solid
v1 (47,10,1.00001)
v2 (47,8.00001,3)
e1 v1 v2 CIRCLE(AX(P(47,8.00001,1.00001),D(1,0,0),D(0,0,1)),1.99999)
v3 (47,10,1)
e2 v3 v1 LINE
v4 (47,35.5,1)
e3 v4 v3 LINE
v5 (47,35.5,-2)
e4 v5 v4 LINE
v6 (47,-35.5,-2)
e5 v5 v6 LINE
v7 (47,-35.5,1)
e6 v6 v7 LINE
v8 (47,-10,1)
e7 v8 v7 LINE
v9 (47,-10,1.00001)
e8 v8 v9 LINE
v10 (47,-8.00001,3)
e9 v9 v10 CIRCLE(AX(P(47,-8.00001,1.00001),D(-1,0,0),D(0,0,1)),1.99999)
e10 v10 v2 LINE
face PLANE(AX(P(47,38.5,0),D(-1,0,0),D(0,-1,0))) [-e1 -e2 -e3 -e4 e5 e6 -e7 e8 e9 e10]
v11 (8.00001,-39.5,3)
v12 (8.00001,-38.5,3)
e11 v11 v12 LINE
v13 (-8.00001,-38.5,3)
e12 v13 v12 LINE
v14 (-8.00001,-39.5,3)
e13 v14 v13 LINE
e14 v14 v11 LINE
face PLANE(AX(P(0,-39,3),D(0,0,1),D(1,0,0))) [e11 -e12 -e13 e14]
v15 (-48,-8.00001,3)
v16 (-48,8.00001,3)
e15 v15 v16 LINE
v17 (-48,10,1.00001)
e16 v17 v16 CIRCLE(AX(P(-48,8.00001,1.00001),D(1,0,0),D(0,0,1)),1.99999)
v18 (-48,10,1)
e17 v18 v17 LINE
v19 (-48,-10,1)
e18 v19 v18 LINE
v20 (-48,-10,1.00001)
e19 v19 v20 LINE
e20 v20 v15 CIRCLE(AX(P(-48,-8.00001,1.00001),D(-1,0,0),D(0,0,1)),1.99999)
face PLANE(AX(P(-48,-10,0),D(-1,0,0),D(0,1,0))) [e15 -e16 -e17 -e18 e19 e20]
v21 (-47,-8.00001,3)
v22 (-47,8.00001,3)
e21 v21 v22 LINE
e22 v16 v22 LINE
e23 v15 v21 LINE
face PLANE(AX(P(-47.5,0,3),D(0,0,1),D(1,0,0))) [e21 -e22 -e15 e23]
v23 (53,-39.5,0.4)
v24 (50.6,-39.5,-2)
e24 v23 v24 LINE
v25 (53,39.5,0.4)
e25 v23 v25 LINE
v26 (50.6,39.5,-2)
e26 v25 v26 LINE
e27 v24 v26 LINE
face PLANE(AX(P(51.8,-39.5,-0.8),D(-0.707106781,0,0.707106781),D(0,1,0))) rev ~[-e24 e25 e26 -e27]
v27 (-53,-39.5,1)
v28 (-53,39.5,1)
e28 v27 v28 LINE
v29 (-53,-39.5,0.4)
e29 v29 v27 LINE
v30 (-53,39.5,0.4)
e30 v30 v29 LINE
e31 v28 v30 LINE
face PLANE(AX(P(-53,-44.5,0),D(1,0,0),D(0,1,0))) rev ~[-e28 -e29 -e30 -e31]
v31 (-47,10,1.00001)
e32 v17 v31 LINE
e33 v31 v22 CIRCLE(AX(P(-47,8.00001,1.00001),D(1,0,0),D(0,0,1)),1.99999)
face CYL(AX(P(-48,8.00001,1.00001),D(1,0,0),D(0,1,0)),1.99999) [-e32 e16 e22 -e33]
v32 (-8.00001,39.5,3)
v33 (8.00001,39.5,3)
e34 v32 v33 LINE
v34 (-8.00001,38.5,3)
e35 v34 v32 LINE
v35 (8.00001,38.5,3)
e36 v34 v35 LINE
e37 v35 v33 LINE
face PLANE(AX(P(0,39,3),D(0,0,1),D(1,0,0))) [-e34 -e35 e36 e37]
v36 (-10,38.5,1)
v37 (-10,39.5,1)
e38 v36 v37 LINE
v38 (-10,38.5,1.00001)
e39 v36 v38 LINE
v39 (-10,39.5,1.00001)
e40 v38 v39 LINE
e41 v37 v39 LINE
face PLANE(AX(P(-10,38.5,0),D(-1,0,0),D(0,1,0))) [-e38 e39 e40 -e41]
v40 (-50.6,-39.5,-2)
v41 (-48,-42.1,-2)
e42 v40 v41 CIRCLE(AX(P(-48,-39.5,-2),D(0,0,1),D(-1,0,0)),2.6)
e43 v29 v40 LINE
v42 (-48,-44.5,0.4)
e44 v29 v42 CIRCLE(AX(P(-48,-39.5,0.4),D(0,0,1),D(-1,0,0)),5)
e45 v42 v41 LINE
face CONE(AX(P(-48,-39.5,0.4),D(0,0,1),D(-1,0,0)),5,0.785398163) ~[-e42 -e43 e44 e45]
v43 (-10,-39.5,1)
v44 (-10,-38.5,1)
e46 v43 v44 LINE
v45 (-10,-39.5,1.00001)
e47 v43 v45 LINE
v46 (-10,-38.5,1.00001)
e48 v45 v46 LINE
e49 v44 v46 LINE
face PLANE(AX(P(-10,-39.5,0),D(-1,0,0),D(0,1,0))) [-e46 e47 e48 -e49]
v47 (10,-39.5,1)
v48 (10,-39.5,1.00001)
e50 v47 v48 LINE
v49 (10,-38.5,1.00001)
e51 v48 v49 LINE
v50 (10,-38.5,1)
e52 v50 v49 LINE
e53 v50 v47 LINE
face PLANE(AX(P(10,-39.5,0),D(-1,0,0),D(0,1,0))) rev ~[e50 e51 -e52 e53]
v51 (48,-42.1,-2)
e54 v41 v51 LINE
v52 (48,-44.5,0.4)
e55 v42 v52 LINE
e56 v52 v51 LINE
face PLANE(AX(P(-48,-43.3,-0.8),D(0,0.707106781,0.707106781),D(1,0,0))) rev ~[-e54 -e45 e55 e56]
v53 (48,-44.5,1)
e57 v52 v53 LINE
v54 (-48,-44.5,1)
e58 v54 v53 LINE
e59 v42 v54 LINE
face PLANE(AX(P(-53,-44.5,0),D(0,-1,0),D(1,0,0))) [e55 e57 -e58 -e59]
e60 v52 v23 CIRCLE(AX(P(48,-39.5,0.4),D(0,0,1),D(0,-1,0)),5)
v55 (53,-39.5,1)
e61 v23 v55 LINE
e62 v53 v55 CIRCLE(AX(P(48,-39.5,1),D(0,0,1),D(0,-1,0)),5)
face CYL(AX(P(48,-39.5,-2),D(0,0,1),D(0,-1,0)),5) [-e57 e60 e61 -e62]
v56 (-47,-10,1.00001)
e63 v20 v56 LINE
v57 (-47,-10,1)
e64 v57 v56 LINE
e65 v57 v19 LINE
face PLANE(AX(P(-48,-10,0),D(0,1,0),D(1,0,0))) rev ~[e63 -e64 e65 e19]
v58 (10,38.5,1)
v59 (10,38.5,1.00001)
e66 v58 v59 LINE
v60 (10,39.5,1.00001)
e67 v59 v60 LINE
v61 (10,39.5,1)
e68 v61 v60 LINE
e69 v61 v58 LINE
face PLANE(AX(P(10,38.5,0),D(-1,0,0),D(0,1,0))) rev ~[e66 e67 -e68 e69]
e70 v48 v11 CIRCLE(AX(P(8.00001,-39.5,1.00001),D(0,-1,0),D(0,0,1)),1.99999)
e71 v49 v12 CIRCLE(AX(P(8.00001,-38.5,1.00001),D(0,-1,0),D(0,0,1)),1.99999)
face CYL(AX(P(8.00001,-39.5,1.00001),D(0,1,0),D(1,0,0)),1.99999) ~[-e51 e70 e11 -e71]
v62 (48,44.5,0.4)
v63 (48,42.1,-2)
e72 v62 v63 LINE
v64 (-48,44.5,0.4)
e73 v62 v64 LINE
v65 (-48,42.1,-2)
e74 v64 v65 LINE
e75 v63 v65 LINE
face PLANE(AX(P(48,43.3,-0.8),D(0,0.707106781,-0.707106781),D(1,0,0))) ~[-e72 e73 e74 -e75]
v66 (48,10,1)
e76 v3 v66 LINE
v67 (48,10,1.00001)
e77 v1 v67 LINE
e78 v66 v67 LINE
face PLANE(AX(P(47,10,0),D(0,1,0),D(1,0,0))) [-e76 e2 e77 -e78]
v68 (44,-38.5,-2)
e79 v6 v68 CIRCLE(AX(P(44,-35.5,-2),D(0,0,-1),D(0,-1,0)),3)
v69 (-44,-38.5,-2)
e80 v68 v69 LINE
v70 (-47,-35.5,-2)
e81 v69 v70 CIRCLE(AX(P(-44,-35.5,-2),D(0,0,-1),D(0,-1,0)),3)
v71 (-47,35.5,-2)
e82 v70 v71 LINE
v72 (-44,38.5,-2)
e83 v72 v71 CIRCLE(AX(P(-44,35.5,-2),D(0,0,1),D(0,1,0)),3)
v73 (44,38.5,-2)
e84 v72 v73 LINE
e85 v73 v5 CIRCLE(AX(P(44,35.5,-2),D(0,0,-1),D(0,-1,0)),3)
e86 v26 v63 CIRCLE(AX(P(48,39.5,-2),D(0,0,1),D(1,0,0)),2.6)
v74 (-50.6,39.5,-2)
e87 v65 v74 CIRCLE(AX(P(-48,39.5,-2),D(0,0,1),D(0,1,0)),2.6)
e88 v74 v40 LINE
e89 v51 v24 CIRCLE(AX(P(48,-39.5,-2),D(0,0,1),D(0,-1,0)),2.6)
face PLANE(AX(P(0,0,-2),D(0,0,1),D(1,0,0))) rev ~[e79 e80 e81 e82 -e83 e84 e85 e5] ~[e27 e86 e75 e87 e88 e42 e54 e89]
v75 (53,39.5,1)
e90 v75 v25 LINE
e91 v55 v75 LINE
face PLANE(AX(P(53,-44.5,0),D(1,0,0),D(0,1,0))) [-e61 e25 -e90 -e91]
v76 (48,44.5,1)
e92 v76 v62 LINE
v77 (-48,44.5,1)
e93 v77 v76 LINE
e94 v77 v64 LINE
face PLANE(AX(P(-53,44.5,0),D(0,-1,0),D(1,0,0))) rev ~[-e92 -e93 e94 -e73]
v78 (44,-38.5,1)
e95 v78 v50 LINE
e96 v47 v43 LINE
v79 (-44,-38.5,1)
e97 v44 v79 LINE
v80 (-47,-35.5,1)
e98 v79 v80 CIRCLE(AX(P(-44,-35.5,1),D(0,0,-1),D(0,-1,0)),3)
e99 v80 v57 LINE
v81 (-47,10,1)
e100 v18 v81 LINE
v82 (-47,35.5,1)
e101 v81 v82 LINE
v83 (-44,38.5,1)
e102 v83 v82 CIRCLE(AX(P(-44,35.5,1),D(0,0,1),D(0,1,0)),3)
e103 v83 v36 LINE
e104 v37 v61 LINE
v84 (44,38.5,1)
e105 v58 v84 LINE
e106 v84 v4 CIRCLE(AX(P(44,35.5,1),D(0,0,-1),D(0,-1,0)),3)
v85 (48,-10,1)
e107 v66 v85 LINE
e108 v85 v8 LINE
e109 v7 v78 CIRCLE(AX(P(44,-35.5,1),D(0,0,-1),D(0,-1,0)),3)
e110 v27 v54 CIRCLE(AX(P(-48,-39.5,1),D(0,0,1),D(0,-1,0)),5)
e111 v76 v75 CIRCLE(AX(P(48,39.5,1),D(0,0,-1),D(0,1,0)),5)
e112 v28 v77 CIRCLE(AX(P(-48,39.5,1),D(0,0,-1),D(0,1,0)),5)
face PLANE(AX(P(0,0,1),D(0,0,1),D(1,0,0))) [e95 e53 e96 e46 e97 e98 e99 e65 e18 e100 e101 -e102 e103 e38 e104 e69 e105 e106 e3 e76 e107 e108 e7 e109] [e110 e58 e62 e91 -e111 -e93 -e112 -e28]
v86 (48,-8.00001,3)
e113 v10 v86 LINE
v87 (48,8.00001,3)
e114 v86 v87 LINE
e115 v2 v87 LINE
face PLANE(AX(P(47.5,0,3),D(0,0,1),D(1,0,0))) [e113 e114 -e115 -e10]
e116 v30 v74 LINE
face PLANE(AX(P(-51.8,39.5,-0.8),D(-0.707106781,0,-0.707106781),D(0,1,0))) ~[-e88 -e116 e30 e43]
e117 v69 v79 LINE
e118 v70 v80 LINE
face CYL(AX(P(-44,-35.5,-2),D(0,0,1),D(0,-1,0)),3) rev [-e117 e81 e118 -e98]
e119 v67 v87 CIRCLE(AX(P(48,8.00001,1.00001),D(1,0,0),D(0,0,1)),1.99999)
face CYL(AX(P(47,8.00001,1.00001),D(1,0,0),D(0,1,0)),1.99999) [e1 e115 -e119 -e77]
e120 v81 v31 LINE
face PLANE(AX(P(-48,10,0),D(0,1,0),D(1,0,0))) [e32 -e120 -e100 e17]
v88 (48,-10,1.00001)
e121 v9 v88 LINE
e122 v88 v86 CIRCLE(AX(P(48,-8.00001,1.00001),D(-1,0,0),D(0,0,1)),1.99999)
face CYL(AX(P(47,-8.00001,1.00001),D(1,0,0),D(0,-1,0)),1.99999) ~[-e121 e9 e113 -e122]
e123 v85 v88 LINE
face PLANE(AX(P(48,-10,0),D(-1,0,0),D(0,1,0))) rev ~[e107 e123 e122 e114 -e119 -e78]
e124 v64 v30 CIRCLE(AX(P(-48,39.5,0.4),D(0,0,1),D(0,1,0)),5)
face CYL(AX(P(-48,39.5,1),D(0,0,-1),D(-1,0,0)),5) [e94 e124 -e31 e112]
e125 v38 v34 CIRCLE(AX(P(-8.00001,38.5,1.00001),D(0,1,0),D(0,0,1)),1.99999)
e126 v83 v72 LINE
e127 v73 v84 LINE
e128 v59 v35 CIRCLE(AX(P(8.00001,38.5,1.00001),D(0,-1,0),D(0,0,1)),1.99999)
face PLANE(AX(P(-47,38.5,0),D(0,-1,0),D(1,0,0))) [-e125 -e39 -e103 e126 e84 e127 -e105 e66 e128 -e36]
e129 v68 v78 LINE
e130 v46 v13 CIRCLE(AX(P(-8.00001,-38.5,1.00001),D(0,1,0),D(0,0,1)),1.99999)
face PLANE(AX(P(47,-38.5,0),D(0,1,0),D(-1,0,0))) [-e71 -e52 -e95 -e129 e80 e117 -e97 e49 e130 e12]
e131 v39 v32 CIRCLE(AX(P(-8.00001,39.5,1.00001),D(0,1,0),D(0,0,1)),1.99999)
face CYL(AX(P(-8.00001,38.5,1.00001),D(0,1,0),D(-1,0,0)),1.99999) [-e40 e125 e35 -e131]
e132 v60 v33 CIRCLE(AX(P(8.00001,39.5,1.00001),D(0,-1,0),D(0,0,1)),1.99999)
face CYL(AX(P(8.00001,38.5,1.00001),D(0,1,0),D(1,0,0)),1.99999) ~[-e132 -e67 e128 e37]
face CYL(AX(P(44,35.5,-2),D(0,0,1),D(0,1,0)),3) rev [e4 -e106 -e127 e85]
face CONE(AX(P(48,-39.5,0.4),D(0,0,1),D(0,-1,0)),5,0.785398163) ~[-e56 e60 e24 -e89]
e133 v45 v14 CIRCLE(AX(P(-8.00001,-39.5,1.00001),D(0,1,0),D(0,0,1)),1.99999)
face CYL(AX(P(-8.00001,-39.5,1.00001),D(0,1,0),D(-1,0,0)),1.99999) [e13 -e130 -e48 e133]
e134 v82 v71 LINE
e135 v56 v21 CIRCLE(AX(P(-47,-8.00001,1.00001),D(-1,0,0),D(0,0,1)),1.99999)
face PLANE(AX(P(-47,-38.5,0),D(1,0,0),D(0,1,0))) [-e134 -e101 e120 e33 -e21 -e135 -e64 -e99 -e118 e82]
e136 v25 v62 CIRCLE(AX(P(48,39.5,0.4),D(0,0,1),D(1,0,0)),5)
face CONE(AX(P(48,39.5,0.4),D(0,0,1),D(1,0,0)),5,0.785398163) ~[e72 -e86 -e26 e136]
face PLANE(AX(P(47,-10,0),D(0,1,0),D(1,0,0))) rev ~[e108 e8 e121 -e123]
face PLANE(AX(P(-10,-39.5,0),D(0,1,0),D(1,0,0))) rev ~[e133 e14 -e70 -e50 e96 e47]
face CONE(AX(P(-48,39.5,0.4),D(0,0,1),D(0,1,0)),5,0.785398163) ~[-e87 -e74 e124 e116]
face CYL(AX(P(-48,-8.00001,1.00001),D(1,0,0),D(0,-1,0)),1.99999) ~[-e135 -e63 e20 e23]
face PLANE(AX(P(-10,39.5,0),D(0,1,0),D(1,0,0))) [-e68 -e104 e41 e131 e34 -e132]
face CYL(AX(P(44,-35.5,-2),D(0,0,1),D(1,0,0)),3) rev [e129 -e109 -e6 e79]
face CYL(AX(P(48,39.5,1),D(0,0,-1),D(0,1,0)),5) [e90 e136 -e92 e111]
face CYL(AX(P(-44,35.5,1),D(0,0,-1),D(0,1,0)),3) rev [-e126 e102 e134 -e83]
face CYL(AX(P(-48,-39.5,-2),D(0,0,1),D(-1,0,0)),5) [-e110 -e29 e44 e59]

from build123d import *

# Parameters (mm, degrees)
F0_W     = 106
F0_H     = 89
F1_DEPTH = 1
F0_W_2   = 20
F0_H_2   = 1
F0_W_3   = 1
F0_H_3   = 20
F2_DEPTH = 3
F3_DEPTH = 2
F4_R     = 3
F5_R     = 5
F6_SIZE2 = 2.4
F6_SIZE  = 2.4
F7_R     = 1.99999


# Not quite as in the source:
# - a fillet or chamfer is up to 0.001 mm smaller than in the source, because OpenCascade refuses the exact size


with BuildPart() as f1:
    # F0 (on Top) → F1 (new body)
    with BuildSketch(Plane.XY):
        Rectangle(F0_W, F0_H)
        Polygon((-47, 10), (-47, 38.5), (-10, 38.5), (-10, 39.5), (10, 39.5), (10, 38.5), (47, 38.5), (47, 10), (48, 10), (48, -10), (47, -10), (47, -38.5), (10, -38.5), (10, -39.5), (-10, -39.5), (-10, -38.5), (-47, -38.5), (-47, -10), (-48, -10), (-48, 10), align=None, mode=Mode.SUBTRACT)
    extrude(amount=F1_DEPTH)

    # F0 (on Top) → F2 (join)
    with BuildSketch(Plane.XY):
        with Locations((0, 39)):
            Rectangle(F0_W_2, F0_H_2)
        with Locations((-47.5, 0)):
            Rectangle(F0_W_3, F0_H_3)
        with Locations((47.5, 0)):
            Rectangle(F0_W_3, F0_H_3)
        with Locations((0, -39)):
            Rectangle(F0_W_2, F0_H_2)
    extrude(amount=F2_DEPTH)

    # F0 (on Top) → F3 (join)
    with BuildSketch(Plane.XY):
        Rectangle(F0_W, F0_H)
        Polygon((-47, 10), (-47, 38.5), (-10, 38.5), (-10, 39.5), (10, 39.5), (10, 38.5), (47, 38.5), (47, 10), (48, 10), (48, -10), (47, -10), (47, -38.5), (10, -38.5), (10, -39.5), (-10, -39.5), (-10, -38.5), (-47, -38.5), (-47, -10), (-48, -10), (-48, 10), align=None, mode=Mode.SUBTRACT)
        with Locations((0, 39)):
            Rectangle(F0_W_2, F0_H_2)
        with Locations((47.5, 0)):
            Rectangle(F0_W_3, F0_H_3)
        with Locations((-47.5, 0)):
            Rectangle(F0_W_3, F0_H_3)
        with Locations((0, -39)):
            Rectangle(F0_W_2, F0_H_2)
    extrude(amount=-F3_DEPTH)

    # F4
    f4_edges = [f1.edges().sort_by_distance(p)[0] for p in [
        (47, 38.5, -0.5),
        (47, -38.5, -0.5),
        (-47, 38.5, -0.5),
        (-47, -38.5, -0.5),
    ]]
    fillet(f4_edges, radius=F4_R)

    # F5
    f5_edges = [f1.edges().sort_by_distance(p)[0] for p in [
        (-53, -44.5, -0.5),
        (53, -44.5, -0.5),
        (-53, 44.5, -0.5),
        (53, 44.5, -0.5),
    ]]
    fillet(f5_edges, radius=F5_R)

    # F6
    f6_edges = [f1.edges().sort_by_distance(p)[0] for p in [
        (0, -44.5, -2),
    ]]
    chamfer(f6_edges, length=F6_SIZE, length2=F6_SIZE2)

    # F7 (radius 2 in the source; OpenCascade refuses exactly that, so slightly less here)
    f7_edges = [f1.edges().sort_by_distance(p)[0] for p in [
        (10, -39, 3),
        (-10, -39, 3),
        (-47.5, -10, 3),
        (-47.5, 10, 3),
        (-10, 39, 3),
        (10, 39, 3),
        (47.5, 10, 3),
        (47.5, -10, 3),
    ]]
    fillet(f7_edges, radius=F7_R)


solid = f1.part
